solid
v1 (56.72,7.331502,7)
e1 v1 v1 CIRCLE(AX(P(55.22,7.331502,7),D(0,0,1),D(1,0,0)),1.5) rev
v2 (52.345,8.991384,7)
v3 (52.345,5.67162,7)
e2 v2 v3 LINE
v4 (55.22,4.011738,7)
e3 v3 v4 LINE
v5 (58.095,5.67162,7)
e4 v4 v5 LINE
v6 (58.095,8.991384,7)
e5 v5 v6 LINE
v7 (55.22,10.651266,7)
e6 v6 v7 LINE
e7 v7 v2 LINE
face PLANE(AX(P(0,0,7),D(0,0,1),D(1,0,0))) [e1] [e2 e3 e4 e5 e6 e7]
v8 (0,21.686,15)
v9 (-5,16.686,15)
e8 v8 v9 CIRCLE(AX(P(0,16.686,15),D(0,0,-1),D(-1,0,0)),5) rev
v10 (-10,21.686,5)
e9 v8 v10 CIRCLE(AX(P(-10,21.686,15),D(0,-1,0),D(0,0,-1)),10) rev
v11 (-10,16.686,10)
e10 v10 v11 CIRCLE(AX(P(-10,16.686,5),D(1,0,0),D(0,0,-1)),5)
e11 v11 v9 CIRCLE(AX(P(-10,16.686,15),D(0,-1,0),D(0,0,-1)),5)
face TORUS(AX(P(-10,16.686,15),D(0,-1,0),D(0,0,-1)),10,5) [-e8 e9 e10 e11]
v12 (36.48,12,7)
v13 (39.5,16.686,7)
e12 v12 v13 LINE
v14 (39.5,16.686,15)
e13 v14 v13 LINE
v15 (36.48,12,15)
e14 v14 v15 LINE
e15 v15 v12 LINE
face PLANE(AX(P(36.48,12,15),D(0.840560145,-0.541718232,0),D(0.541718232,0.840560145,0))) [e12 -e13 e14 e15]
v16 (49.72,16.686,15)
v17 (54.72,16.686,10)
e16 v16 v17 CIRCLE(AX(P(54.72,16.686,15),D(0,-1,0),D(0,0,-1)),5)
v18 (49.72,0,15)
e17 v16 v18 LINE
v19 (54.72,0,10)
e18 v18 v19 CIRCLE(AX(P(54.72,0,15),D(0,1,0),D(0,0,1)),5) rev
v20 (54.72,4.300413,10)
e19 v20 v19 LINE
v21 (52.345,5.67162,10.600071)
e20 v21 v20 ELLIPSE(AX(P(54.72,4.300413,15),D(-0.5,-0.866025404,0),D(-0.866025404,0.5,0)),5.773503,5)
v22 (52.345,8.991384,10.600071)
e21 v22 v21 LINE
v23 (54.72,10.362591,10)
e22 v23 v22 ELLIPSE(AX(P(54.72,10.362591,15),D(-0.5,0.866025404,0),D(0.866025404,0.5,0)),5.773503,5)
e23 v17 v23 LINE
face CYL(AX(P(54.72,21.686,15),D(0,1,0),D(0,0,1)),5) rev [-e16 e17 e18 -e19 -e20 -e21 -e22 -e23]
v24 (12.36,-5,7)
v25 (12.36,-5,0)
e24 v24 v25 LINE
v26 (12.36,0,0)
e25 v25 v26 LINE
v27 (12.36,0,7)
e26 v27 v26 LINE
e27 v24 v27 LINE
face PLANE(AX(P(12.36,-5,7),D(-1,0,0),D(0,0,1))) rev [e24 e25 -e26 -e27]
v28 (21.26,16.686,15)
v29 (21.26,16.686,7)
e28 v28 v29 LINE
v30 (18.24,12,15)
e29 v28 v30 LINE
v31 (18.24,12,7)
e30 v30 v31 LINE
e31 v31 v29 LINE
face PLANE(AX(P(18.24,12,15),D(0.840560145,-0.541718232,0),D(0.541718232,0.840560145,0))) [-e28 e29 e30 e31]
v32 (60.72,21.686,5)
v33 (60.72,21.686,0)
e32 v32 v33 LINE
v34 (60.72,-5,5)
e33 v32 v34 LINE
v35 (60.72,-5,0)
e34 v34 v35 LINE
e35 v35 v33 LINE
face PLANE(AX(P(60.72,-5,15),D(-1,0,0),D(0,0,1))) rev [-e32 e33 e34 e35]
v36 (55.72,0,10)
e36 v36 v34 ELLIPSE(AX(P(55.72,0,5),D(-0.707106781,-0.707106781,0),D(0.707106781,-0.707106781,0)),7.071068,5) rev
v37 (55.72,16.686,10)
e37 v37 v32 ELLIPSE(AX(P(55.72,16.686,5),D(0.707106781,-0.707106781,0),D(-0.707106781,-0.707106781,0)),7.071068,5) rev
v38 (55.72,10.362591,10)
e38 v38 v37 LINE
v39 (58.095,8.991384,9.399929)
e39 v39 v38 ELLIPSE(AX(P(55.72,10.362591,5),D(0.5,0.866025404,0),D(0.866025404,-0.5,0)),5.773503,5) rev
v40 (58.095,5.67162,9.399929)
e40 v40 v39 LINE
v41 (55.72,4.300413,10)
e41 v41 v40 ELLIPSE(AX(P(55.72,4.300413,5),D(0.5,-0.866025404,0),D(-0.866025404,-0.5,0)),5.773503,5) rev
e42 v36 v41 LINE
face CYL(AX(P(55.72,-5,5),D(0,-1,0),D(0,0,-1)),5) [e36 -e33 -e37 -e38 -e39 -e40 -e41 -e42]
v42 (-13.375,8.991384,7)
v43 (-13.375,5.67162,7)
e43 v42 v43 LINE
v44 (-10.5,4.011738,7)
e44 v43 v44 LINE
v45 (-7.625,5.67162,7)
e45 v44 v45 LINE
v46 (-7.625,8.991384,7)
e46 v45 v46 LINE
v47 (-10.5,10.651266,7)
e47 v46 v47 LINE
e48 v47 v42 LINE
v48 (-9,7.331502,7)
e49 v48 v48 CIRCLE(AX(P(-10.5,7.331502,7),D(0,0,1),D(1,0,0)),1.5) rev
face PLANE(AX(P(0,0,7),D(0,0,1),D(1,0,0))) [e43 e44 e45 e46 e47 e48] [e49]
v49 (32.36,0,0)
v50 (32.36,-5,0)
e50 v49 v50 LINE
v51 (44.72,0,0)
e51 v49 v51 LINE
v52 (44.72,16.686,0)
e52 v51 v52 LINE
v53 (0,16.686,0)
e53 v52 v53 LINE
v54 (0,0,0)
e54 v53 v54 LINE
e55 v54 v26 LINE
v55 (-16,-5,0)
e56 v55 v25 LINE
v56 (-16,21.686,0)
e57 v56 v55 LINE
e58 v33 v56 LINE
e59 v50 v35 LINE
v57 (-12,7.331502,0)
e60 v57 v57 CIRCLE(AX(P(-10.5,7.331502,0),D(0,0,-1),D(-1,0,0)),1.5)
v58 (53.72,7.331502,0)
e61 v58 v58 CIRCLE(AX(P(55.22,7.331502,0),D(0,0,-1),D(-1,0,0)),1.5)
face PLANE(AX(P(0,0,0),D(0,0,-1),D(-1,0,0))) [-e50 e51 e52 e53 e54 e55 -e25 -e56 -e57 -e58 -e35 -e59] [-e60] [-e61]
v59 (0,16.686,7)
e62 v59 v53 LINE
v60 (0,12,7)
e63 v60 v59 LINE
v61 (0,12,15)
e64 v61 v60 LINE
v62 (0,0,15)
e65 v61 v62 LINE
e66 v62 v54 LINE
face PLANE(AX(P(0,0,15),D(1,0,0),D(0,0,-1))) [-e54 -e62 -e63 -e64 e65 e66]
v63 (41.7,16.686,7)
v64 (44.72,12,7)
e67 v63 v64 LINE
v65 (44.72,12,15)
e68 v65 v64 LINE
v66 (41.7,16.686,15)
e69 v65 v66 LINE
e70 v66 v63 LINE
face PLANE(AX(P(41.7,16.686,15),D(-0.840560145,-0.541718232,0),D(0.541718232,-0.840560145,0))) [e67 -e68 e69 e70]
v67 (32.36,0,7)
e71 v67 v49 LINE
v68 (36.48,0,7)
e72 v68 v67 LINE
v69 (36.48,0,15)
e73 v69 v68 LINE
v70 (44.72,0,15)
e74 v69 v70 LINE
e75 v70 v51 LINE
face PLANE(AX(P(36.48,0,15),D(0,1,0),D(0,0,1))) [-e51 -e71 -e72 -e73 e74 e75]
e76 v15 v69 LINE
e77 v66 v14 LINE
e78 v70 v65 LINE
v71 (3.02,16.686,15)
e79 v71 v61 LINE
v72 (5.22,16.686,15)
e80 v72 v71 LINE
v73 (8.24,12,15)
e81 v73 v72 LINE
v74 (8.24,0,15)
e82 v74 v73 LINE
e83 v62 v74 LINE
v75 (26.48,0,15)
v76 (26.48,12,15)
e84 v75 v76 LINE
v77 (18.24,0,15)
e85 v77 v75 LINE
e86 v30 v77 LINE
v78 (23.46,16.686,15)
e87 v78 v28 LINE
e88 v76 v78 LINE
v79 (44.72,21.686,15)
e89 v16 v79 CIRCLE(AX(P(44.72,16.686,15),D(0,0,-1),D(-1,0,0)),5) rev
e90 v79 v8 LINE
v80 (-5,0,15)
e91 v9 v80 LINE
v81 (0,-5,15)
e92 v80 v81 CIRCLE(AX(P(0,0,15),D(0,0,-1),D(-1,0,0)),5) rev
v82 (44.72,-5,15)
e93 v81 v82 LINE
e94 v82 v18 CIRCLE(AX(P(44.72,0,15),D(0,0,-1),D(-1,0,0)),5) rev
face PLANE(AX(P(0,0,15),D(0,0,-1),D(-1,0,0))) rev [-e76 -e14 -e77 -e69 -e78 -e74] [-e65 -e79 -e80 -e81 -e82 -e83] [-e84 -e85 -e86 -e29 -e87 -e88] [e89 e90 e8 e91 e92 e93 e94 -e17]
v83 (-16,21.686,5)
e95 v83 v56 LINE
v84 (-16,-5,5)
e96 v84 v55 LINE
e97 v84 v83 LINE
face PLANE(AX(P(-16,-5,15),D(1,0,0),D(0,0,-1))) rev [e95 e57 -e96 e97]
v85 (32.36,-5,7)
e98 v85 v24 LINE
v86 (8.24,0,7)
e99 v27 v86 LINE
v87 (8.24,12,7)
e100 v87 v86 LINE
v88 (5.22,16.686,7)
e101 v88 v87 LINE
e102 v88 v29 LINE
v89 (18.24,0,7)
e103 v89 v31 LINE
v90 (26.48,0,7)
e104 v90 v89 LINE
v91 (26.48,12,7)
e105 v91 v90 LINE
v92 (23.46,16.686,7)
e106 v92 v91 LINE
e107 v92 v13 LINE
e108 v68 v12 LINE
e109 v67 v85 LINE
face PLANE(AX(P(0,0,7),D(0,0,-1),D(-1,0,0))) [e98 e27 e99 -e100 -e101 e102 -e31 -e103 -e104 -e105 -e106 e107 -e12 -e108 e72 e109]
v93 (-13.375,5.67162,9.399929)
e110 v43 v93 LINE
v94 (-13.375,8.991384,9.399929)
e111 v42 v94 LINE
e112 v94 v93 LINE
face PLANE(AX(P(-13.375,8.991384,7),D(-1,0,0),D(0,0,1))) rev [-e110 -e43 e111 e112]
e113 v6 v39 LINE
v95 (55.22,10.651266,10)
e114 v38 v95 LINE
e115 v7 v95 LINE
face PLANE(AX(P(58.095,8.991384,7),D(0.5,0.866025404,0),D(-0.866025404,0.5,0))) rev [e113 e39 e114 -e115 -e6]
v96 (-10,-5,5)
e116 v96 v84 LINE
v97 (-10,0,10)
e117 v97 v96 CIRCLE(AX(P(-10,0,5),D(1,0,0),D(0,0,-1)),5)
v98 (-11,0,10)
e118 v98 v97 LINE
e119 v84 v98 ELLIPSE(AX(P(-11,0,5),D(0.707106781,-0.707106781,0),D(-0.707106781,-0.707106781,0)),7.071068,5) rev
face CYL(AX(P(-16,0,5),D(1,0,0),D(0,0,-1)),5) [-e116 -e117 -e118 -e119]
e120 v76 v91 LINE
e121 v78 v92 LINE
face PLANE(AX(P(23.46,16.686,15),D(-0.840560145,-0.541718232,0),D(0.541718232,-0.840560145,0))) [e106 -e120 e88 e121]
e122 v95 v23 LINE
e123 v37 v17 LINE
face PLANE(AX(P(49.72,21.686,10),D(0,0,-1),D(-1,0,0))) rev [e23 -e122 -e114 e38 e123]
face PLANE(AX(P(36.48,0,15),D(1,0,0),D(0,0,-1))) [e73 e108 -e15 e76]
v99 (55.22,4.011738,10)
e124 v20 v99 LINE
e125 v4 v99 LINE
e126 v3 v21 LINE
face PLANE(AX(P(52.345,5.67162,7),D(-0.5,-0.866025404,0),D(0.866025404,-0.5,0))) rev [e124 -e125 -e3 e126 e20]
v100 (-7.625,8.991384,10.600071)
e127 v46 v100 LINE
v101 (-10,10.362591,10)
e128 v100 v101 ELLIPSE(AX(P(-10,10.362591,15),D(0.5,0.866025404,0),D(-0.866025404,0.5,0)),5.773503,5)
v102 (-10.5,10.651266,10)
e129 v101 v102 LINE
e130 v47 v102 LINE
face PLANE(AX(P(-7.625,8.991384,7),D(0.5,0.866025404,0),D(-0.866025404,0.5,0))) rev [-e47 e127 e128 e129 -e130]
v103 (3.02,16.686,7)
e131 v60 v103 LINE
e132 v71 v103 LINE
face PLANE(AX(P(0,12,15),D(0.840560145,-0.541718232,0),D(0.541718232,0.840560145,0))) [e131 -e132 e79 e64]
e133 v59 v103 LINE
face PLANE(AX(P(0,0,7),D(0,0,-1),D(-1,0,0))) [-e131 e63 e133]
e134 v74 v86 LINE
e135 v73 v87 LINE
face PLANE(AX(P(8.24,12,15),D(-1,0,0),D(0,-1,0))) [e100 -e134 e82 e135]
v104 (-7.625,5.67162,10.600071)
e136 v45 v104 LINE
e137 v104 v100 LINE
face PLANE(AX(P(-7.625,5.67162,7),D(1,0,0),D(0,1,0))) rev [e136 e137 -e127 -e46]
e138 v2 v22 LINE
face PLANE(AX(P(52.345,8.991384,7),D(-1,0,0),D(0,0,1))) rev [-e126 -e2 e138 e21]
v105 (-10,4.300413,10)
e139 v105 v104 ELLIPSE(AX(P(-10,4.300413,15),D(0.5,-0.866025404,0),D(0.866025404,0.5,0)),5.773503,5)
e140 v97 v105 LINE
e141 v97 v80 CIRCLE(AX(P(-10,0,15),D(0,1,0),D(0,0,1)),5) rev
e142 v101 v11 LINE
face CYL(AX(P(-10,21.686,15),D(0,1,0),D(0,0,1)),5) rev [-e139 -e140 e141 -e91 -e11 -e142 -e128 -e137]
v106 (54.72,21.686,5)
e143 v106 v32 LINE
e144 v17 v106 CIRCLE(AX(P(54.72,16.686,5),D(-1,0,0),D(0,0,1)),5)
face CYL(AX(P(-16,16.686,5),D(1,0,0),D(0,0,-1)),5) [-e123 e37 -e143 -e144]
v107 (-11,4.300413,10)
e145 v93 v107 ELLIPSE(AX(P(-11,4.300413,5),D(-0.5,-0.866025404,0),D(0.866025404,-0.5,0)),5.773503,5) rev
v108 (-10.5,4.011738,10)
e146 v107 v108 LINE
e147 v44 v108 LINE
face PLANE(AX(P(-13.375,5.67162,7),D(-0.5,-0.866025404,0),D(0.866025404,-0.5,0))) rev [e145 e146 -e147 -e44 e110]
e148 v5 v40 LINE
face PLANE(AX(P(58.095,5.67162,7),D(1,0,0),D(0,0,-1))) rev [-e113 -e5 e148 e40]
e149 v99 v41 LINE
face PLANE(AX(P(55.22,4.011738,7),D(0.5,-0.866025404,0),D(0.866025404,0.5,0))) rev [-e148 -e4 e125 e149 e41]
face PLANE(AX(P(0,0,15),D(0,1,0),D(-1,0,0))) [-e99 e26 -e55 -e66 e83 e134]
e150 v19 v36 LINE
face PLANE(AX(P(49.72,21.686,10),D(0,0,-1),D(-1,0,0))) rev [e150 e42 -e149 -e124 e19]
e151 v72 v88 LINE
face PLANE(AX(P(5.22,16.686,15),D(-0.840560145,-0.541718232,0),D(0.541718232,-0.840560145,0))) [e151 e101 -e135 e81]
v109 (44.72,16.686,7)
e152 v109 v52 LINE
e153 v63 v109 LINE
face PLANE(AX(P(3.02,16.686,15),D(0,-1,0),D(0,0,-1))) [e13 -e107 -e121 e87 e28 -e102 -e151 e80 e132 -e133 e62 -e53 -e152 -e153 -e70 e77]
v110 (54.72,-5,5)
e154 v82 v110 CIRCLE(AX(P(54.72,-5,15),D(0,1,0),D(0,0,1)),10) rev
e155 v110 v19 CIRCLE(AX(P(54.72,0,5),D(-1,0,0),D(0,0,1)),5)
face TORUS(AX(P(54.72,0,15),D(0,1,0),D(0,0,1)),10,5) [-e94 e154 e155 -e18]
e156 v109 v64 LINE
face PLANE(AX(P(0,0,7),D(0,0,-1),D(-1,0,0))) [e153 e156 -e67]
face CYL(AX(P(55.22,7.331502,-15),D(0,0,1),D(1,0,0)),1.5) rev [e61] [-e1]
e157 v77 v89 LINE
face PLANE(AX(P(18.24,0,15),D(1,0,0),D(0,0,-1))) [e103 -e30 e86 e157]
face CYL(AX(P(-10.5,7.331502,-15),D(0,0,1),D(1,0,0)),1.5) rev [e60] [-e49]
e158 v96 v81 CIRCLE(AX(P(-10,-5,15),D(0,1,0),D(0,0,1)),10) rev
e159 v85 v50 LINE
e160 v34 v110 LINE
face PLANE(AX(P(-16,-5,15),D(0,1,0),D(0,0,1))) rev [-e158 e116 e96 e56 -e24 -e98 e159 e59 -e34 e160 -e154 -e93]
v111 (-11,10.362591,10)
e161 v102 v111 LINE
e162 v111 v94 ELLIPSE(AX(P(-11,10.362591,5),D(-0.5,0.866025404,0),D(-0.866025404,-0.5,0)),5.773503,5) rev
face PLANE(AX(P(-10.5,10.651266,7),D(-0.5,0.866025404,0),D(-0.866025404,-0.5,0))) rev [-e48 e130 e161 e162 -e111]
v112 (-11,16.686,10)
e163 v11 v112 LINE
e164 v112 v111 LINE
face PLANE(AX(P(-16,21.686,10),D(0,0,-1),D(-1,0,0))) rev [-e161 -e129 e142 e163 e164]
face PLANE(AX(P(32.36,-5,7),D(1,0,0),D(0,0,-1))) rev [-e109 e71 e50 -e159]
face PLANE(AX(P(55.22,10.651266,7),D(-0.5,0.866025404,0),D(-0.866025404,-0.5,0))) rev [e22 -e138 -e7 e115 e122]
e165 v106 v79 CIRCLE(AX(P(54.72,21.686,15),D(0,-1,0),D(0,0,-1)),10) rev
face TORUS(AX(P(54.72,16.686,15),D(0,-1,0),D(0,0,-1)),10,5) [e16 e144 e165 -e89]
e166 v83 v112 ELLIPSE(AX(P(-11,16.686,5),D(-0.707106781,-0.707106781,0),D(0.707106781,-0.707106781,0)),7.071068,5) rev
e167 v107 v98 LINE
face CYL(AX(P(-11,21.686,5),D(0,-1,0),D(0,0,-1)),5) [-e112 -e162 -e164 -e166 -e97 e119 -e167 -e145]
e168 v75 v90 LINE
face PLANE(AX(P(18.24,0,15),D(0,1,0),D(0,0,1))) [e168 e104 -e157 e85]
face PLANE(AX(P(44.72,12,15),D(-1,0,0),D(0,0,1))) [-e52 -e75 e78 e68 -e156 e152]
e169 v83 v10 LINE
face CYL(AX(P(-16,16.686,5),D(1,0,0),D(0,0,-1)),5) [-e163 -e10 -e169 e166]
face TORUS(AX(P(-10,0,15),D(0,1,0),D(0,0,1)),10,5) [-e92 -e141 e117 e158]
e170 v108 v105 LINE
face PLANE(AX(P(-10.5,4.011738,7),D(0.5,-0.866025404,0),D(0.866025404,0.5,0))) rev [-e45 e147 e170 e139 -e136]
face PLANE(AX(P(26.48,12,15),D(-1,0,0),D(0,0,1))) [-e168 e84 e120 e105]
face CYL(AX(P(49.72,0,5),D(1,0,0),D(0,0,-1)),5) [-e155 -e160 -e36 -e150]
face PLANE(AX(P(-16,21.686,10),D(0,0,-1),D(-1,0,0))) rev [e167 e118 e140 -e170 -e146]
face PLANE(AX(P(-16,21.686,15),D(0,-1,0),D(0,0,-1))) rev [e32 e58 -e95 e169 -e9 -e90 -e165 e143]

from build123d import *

# Parameters (mm, degrees)
SKETCH1_W           = 76.72
SKETCH1_H           = 26.686
BOSS_EXTRUDE1_DEPTH = 15
SKETCH2_W           = 11
SKETCH2_H           = 5
CUT_EXTRUDE1_DEPTH  = 69.000448499
SKETCH3_R           = 1.5
CUT_EXTRUDE2_DEPTH  = 25
CUT_EXTRUDE3_DEPTH  = 3
CUT_EXTRUDE5_DEPTH  = 7
FILLET1_R           = 5


with BuildPart() as part:
    # Sketch1 → Boss-Extrude1 (new body)
    with BuildSketch(Plane.XY):
        with Locations((22.36, 8.343)):
            Rectangle(SKETCH1_W, SKETCH1_H)
        Polygon((0, 0), (0, 12), (3.02, 16.686), (5.22, 16.686), (8.24, 12), (8.24, 0), align=None, mode=Mode.SUBTRACT)
        Polygon((23.46, 16.686), (26.48, 12), (26.48, 0), (18.24, 0), (18.24, 12), (21.26, 16.686), align=None, mode=Mode.SUBTRACT)
        Polygon((41.7, 16.686), (44.72, 12), (44.72, 0), (36.48, 0), (36.48, 12), (39.5, 16.686), align=None, mode=Mode.SUBTRACT)
    extrude(amount=BOSS_EXTRUDE1_DEPTH)

    # Sketch2 → Cut-Extrude1 (cut, through all)
    with BuildSketch(Plane(origin=(0, -5, 0), x_dir=(-1, 0, 0), z_dir=(0, -1, 0))):
        with Locations((10.5, -12.5)):
            Rectangle(SKETCH2_W, SKETCH2_H)
        with Locations((-55.22, -12.5)):
            Rectangle(SKETCH2_W, SKETCH2_H)
    extrude(amount=-CUT_EXTRUDE1_DEPTH, mode=Mode.SUBTRACT)

    # Sketch3 → Cut-Extrude2 (cut)
    with BuildSketch(Plane.XY.offset(10)):
        with Locations((-10.5, 7.331502285)):
            Circle(SKETCH3_R)
        with Locations((55.22, 7.331502285)):
            Circle(SKETCH3_R)
    extrude(amount=-CUT_EXTRUDE2_DEPTH, mode=Mode.SUBTRACT)

    # Sketch4 → Cut-Extrude3 (cut)
    with BuildSketch(Plane.XY.offset(10)):
        Polygon((-10.5, 10.651266332), (-13.375, 8.991384309), (-13.375, 5.671620261), (-10.5, 4.011738237), (-7.625, 5.671620261), (-7.625, 8.991384309), align=None)
        Polygon((55.22, 10.651266332), (52.345, 8.991384309), (52.345, 5.671620261), (55.22, 4.011738237), (58.095, 5.671620261), (58.095, 8.991384309), align=None)
    extrude(amount=-CUT_EXTRUDE3_DEPTH, mode=Mode.SUBTRACT)

    # Sketch7 → Cut-Extrude5 (cut)
    with BuildSketch(Plane(origin=(0, 0, 0), x_dir=(-1, 0, 0), z_dir=(0, 0, -1))):
        Polygon((0, 0), (-12.36, 0), (-12.36, -5), (-32.36, -5), (-32.36, 0), (-44.72, 0), (-44.72, 16.686), (0, 16.686), align=None)
    extrude(amount=-CUT_EXTRUDE5_DEPTH, mode=Mode.SUBTRACT)

    # Fillet1
    # the kernel refuses this fillet: 5 mm, written as the material it adds along each edge
    with BuildSketch(Plane(origin=(49.72, -5, 10), x_dir=(0, 0, 1), z_dir=(0, 1, 0))) as fillet1_piece_1_section:
        with BuildLine():
            CenterArc((FILLET1_R, FILLET1_R), FILLET1_R, 180, 90)
            Line((0, FILLET1_R), (0, 0))
            Line((0, 0), (FILLET1_R, 0))
        make_face()
    fillet1_piece_1 = extrude(amount=26.686, mode=Mode.PRIVATE)
    fillet1_piece_1 = split(fillet1_piece_1, bisect_by=Plane(origin=(52.345, 0.855809372, 11.280904263), z_dir=(-1, 0, 0)), keep=Keep.TOP, mode=Mode.PRIVATE)
    fillet1_piece_1 = split(fillet1_piece_1, bisect_by=Plane(origin=(53.079309625, 5.247666401, 11.280904263), z_dir=(-0.5000000000000012, -0.866025403784438, 0)), keep=Keep.TOP, mode=Mode.PRIVATE)
    add(fillet1_piece_1)
    with BuildSketch(Plane(origin=(49.72, -5, 10), x_dir=(0, 0, 1), z_dir=(0, 1, 0))) as fillet1_piece_2_section:
        with BuildLine():
            CenterArc((FILLET1_R, FILLET1_R), FILLET1_R, 180, 90)
            Line((0, FILLET1_R), (0, 0))
            Line((0, 0), (FILLET1_R, 0))
        make_face()
    fillet1_piece_2 = extrude(amount=26.686, mode=Mode.PRIVATE)
    fillet1_piece_2 = split(fillet1_piece_2, bisect_by=Plane(origin=(52.345, 0.113882783, 10.103766802), z_dir=(1, 0, 0)), keep=Keep.TOP, mode=Mode.PRIVATE)
    fillet1_piece_2 = split(fillet1_piece_2, bisect_by=Plane(origin=(55.328155085, 3.94929487, 10.103766802), z_dir=(-0.5000000000000012, -0.866025403784438, 0)), keep=Keep.TOP, mode=Mode.PRIVATE)
    add(fillet1_piece_2)
    with BuildSketch(Plane(origin=(49.72, -5, 10), x_dir=(0, 0, 1), z_dir=(0, 1, 0))) as fillet1_piece_3_section:
        with BuildLine():
            CenterArc((FILLET1_R, FILLET1_R), FILLET1_R, 180, 90)
            Line((0, FILLET1_R), (0, 0))
            Line((0, 0), (FILLET1_R, 0))
        make_face()
    fillet1_piece_3 = extrude(amount=26.686, mode=Mode.PRIVATE)
    fillet1_piece_3 = split(fillet1_piece_3, bisect_by=Plane(origin=(50.660222367, 8.018677488, 10.86123456), z_dir=(0.5000000000000002, -0.8660254037844386, 0)), keep=Keep.TOP, mode=Mode.PRIVATE)
    fillet1_piece_3 = split(fillet1_piece_3, bisect_by=Plane(origin=(52.345, 7.331502285, 10.86123456), z_dir=(-1, 0, 0)), keep=Keep.TOP, mode=Mode.PRIVATE)
    fillet1_piece_3 = split(fillet1_piece_3, bisect_by=Plane(origin=(50.660222367, 6.644327081, 10.86123456), z_dir=(0.5000000000000012, 0.866025403784438, 0)), keep=Keep.TOP, mode=Mode.PRIVATE)
    add(fillet1_piece_3)
    with BuildSketch(Plane(origin=(49.72, -5, 10), x_dir=(0, 0, 1), z_dir=(0, 1, 0))) as fillet1_piece_4_section:
        with BuildLine():
            CenterArc((FILLET1_R, FILLET1_R), FILLET1_R, 180, 90)
            Line((0, FILLET1_R), (0, 0))
            Line((0, 0), (FILLET1_R, 0))
        make_face()
    fillet1_piece_4 = extrude(amount=26.686, mode=Mode.PRIVATE)
    fillet1_piece_4 = split(fillet1_piece_4, bisect_by=Plane(origin=(53.520712077, 9.670181993, 11.277716929), z_dir=(-0.5000000000000002, 0.8660254037844386, 0)), keep=Keep.TOP, mode=Mode.PRIVATE)
    fillet1_piece_4 = split(fillet1_piece_4, bisect_by=Plane(origin=(52.345, 14.819818281, 11.277716929), z_dir=(-1, 0, 0)), keep=Keep.TOP, mode=Mode.PRIVATE)
    add(fillet1_piece_4)
    with BuildSketch(Plane(origin=(49.72, -5, 10), x_dir=(0, 0, 1), z_dir=(0, 1, 0))) as fillet1_piece_5_section:
        with BuildLine():
            CenterArc((FILLET1_R, FILLET1_R), FILLET1_R, 180, 90)
            Line((0, FILLET1_R), (0, 0))
            Line((0, 0), (FILLET1_R, 0))
        make_face()
    fillet1_piece_5 = extrude(amount=26.686, mode=Mode.PRIVATE)
    fillet1_piece_5 = split(fillet1_piece_5, bisect_by=Plane(origin=(55.769242126, 10.968371422, 10.103260702), z_dir=(-0.5000000000000002, 0.8660254037844386, 0)), keep=Keep.TOP, mode=Mode.PRIVATE)
    fillet1_piece_5 = split(fillet1_piece_5, bisect_by=Plane(origin=(52.345, 15.561640812, 10.103260702), z_dir=(1, 0, 0)), keep=Keep.TOP, mode=Mode.PRIVATE)
    add(fillet1_piece_5)
    with BuildSketch(Plane(origin=(-5, -5, 10), x_dir=(-1, 0, 0), z_dir=(0, 1, 0))) as fillet1_piece_6_section:
        with BuildLine():
            CenterArc((FILLET1_R, FILLET1_R), FILLET1_R, 180, 90)
            Line((0, FILLET1_R), (0, 0))
            Line((0, 0), (FILLET1_R, 0))
        make_face()
    fillet1_piece_6 = extrude(amount=26.686, mode=Mode.PRIVATE)
    fillet1_piece_6 = split(fillet1_piece_6, bisect_by=Plane(origin=(-10.608155085, 3.94929487, 10.103766802), z_dir=(0.5000000000000003, -0.8660254037844387, 0)), keep=Keep.TOP, mode=Mode.PRIVATE)
    fillet1_piece_6 = split(fillet1_piece_6, bisect_by=Plane(origin=(-7.625, 0.113882783, 10.103766802), z_dir=(-1, 0, 0)), keep=Keep.TOP, mode=Mode.PRIVATE)
    add(fillet1_piece_6)
    with BuildSketch(Plane(origin=(-5, -5, 10), x_dir=(-1, 0, 0), z_dir=(0, 1, 0))) as fillet1_piece_7_section:
        with BuildLine():
            CenterArc((FILLET1_R, FILLET1_R), FILLET1_R, 180, 90)
            Line((0, FILLET1_R), (0, 0))
            Line((0, 0), (FILLET1_R, 0))
        make_face()
    fillet1_piece_7 = extrude(amount=26.686, mode=Mode.PRIVATE)
    fillet1_piece_7 = split(fillet1_piece_7, bisect_by=Plane(origin=(-8.359309625, 5.247666401, 11.280904263), z_dir=(0.5000000000000003, -0.8660254037844387, 0)), keep=Keep.TOP, mode=Mode.PRIVATE)
    fillet1_piece_7 = split(fillet1_piece_7, bisect_by=Plane(origin=(-7.625, 0.855809372, 11.280904263), z_dir=(1, 0, 0)), keep=Keep.TOP, mode=Mode.PRIVATE)
    add(fillet1_piece_7)
    with BuildSketch(Plane(origin=(-5, -5, 10), x_dir=(-1, 0, 0), z_dir=(0, 1, 0))) as fillet1_piece_8_section:
        with BuildLine():
            CenterArc((FILLET1_R, FILLET1_R), FILLET1_R, 180, 90)
            Line((0, FILLET1_R), (0, 0))
            Line((0, 0), (FILLET1_R, 0))
        make_face()
    fillet1_piece_8 = extrude(amount=26.686, mode=Mode.PRIVATE)
    fillet1_piece_8 = split(fillet1_piece_8, bisect_by=Plane(origin=(-5.940222366, 6.644327081, 10.861234561), z_dir=(-0.5000000000000003, 0.8660254037844387, 0)), keep=Keep.TOP, mode=Mode.PRIVATE)
    fillet1_piece_8 = split(fillet1_piece_8, bisect_by=Plane(origin=(-7.625, 7.331502285, 10.861234561), z_dir=(1, 0, 0)), keep=Keep.TOP, mode=Mode.PRIVATE)
    fillet1_piece_8 = split(fillet1_piece_8, bisect_by=Plane(origin=(-5.940222366, 8.018677488, 10.861234561), z_dir=(-0.49999999999999967, -0.8660254037844388, 0)), keep=Keep.TOP, mode=Mode.PRIVATE)
    add(fillet1_piece_8)
    with BuildSketch(Plane(origin=(-5, -5, 10), x_dir=(-1, 0, 0), z_dir=(0, 1, 0))) as fillet1_piece_9_section:
        with BuildLine():
            CenterArc((FILLET1_R, FILLET1_R), FILLET1_R, 180, 90)
            Line((0, FILLET1_R), (0, 0))
            Line((0, 0), (FILLET1_R, 0))
        make_face()
    fillet1_piece_9 = extrude(amount=26.686, mode=Mode.PRIVATE)
    fillet1_piece_9 = split(fillet1_piece_9, bisect_by=Plane(origin=(-7.625, 15.561640812, 10.103260702), z_dir=(-1, 0, 0)), keep=Keep.TOP, mode=Mode.PRIVATE)
    fillet1_piece_9 = split(fillet1_piece_9, bisect_by=Plane(origin=(-11.049242126, 10.968371422, 10.103260702), z_dir=(0.49999999999999967, 0.8660254037844388, 0)), keep=Keep.TOP, mode=Mode.PRIVATE)
    add(fillet1_piece_9)
    with BuildSketch(Plane(origin=(-5, -5, 10), x_dir=(-1, 0, 0), z_dir=(0, 1, 0))) as fillet1_piece_10_section:
        with BuildLine():
            CenterArc((FILLET1_R, FILLET1_R), FILLET1_R, 180, 90)
            Line((0, FILLET1_R), (0, 0))
            Line((0, 0), (FILLET1_R, 0))
        make_face()
    fillet1_piece_10 = extrude(amount=26.686, mode=Mode.PRIVATE)
    fillet1_piece_10 = split(fillet1_piece_10, bisect_by=Plane(origin=(-7.625, 14.819818281, 11.277716929), z_dir=(1, 0, 0)), keep=Keep.TOP, mode=Mode.PRIVATE)
    fillet1_piece_10 = split(fillet1_piece_10, bisect_by=Plane(origin=(-8.800712077, 9.670181993, 11.277716929), z_dir=(0.49999999999999967, 0.8660254037844388, 0)), keep=Keep.TOP, mode=Mode.PRIVATE)
    add(fillet1_piece_10)
    # the kernel refuses this fillet: 5 mm, written as the material it takes off along each edge
    with BuildSketch(Plane(origin=(60.72, -17.5, 10), x_dir=(0, 0, -1), z_dir=(0, 1, 0)), Plane(origin=(-16, -17.5, 10), x_dir=(1, 0, 0), z_dir=(0, 1, 0))) as fillet1_2_piece_1:
        with BuildLine():
            CenterArc((FILLET1_R, FILLET1_R), FILLET1_R, 180, 90)
            Line((0, FILLET1_R), (0, 0))
            Line((0, 0), (FILLET1_R, 0))
        make_face()
    extrude(amount=51.686, mode=Mode.SUBTRACT)
    with BuildSketch(Plane(origin=(73.22, 21.686, 10), x_dir=(0, 0, -1), z_dir=(-1, 0, 0)), Plane(origin=(-10, 21.686, 10), x_dir=(0, 0, -1), z_dir=(-1, 0, 0))) as fillet1_2_piece_2:
        with BuildLine():
            CenterArc((FILLET1_R, FILLET1_R), FILLET1_R, 180, 90)
            Line((0, FILLET1_R), (0, 0))
            Line((0, 0), (FILLET1_R, 0))
        make_face()
    extrude(amount=18.5, mode=Mode.SUBTRACT)
    with BuildSketch(Plane(origin=(73.22, -5, 10), x_dir=(0, 0, -1), z_dir=(-1, 0, 0)), Plane(origin=(-10, -5, 10), x_dir=(0, 0, -1), z_dir=(-1, 0, 0))) as fillet1_2_piece_3:
        with BuildLine():
            CenterArc((FILLET1_R, -FILLET1_R), FILLET1_R, 90, 90)
            Line((0, -FILLET1_R), (0, 0))
            Line((0, 0), (FILLET1_R, 0))
        make_face()
    extrude(amount=18.5, mode=Mode.SUBTRACT)
    with BuildSketch(Plane(origin=(-10, -5, 15), x_dir=(-0.8017442392976459, 0, 0.5976672776328307), z_dir=(-0.5976672776328307, 0, -0.8017442392976459))) as fillet1_2_piece_4:
        with BuildLine():
            CenterArc((5 + FILLET1_R, FILLET1_R), FILLET1_R, 180, 90)
            Line((5, FILLET1_R), (5, 0))
            Line((5, 0), (5 + FILLET1_R, 0))
        make_face()
    revolve(axis=Axis((-10, -5, 15), (0, 1, 0)), revolution_arc=233.296989237, mode=Mode.SUBTRACT)
    with BuildSketch(Plane(origin=(-10, 21.686, 15), x_dir=(0, 0, -1), z_dir=(-1, 0, 0))) as fillet1_2_piece_5:
        with BuildLine():
            CenterArc((5 + FILLET1_R, FILLET1_R), FILLET1_R, 180, 90)
            Line((5, FILLET1_R), (5, 0))
            Line((5, 0), (5 + FILLET1_R, 0))
        make_face()
    revolve(axis=Axis((-10, 21.686, 15), (0, -1, 0)), revolution_arc=233.296989237, mode=Mode.SUBTRACT)
    with BuildSketch(Plane(origin=(54.72, -5, 15), x_dir=(0, 0, -1), z_dir=(1, 0, 0))) as fillet1_2_piece_6:
        with BuildLine():
            CenterArc((5 + FILLET1_R, FILLET1_R), FILLET1_R, 180, 90)
            Line((5, FILLET1_R), (5, 0))
            Line((5, 0), (5 + FILLET1_R, 0))
        make_face()
    revolve(axis=Axis((54.72, -5, 15), (0, 1, 0)), revolution_arc=233.296989237, mode=Mode.SUBTRACT)
    with BuildSketch(Plane(origin=(54.72, 21.686, 15), x_dir=(0.8017442392976476, 0, 0.5976672776328285), z_dir=(0.5976672776328285, 0, -0.8017442392976476))) as fillet1_2_piece_7:
        with BuildLine():
            CenterArc((5 + FILLET1_R, FILLET1_R), FILLET1_R, 180, 90)
            Line((5, FILLET1_R), (5, 0))
            Line((5, 0), (5 + FILLET1_R, 0))
        make_face()
    revolve(axis=Axis((54.72, 21.686, 15), (0, -1, 0)), revolution_arc=233.296989237, mode=Mode.SUBTRACT)


solid = part.part
